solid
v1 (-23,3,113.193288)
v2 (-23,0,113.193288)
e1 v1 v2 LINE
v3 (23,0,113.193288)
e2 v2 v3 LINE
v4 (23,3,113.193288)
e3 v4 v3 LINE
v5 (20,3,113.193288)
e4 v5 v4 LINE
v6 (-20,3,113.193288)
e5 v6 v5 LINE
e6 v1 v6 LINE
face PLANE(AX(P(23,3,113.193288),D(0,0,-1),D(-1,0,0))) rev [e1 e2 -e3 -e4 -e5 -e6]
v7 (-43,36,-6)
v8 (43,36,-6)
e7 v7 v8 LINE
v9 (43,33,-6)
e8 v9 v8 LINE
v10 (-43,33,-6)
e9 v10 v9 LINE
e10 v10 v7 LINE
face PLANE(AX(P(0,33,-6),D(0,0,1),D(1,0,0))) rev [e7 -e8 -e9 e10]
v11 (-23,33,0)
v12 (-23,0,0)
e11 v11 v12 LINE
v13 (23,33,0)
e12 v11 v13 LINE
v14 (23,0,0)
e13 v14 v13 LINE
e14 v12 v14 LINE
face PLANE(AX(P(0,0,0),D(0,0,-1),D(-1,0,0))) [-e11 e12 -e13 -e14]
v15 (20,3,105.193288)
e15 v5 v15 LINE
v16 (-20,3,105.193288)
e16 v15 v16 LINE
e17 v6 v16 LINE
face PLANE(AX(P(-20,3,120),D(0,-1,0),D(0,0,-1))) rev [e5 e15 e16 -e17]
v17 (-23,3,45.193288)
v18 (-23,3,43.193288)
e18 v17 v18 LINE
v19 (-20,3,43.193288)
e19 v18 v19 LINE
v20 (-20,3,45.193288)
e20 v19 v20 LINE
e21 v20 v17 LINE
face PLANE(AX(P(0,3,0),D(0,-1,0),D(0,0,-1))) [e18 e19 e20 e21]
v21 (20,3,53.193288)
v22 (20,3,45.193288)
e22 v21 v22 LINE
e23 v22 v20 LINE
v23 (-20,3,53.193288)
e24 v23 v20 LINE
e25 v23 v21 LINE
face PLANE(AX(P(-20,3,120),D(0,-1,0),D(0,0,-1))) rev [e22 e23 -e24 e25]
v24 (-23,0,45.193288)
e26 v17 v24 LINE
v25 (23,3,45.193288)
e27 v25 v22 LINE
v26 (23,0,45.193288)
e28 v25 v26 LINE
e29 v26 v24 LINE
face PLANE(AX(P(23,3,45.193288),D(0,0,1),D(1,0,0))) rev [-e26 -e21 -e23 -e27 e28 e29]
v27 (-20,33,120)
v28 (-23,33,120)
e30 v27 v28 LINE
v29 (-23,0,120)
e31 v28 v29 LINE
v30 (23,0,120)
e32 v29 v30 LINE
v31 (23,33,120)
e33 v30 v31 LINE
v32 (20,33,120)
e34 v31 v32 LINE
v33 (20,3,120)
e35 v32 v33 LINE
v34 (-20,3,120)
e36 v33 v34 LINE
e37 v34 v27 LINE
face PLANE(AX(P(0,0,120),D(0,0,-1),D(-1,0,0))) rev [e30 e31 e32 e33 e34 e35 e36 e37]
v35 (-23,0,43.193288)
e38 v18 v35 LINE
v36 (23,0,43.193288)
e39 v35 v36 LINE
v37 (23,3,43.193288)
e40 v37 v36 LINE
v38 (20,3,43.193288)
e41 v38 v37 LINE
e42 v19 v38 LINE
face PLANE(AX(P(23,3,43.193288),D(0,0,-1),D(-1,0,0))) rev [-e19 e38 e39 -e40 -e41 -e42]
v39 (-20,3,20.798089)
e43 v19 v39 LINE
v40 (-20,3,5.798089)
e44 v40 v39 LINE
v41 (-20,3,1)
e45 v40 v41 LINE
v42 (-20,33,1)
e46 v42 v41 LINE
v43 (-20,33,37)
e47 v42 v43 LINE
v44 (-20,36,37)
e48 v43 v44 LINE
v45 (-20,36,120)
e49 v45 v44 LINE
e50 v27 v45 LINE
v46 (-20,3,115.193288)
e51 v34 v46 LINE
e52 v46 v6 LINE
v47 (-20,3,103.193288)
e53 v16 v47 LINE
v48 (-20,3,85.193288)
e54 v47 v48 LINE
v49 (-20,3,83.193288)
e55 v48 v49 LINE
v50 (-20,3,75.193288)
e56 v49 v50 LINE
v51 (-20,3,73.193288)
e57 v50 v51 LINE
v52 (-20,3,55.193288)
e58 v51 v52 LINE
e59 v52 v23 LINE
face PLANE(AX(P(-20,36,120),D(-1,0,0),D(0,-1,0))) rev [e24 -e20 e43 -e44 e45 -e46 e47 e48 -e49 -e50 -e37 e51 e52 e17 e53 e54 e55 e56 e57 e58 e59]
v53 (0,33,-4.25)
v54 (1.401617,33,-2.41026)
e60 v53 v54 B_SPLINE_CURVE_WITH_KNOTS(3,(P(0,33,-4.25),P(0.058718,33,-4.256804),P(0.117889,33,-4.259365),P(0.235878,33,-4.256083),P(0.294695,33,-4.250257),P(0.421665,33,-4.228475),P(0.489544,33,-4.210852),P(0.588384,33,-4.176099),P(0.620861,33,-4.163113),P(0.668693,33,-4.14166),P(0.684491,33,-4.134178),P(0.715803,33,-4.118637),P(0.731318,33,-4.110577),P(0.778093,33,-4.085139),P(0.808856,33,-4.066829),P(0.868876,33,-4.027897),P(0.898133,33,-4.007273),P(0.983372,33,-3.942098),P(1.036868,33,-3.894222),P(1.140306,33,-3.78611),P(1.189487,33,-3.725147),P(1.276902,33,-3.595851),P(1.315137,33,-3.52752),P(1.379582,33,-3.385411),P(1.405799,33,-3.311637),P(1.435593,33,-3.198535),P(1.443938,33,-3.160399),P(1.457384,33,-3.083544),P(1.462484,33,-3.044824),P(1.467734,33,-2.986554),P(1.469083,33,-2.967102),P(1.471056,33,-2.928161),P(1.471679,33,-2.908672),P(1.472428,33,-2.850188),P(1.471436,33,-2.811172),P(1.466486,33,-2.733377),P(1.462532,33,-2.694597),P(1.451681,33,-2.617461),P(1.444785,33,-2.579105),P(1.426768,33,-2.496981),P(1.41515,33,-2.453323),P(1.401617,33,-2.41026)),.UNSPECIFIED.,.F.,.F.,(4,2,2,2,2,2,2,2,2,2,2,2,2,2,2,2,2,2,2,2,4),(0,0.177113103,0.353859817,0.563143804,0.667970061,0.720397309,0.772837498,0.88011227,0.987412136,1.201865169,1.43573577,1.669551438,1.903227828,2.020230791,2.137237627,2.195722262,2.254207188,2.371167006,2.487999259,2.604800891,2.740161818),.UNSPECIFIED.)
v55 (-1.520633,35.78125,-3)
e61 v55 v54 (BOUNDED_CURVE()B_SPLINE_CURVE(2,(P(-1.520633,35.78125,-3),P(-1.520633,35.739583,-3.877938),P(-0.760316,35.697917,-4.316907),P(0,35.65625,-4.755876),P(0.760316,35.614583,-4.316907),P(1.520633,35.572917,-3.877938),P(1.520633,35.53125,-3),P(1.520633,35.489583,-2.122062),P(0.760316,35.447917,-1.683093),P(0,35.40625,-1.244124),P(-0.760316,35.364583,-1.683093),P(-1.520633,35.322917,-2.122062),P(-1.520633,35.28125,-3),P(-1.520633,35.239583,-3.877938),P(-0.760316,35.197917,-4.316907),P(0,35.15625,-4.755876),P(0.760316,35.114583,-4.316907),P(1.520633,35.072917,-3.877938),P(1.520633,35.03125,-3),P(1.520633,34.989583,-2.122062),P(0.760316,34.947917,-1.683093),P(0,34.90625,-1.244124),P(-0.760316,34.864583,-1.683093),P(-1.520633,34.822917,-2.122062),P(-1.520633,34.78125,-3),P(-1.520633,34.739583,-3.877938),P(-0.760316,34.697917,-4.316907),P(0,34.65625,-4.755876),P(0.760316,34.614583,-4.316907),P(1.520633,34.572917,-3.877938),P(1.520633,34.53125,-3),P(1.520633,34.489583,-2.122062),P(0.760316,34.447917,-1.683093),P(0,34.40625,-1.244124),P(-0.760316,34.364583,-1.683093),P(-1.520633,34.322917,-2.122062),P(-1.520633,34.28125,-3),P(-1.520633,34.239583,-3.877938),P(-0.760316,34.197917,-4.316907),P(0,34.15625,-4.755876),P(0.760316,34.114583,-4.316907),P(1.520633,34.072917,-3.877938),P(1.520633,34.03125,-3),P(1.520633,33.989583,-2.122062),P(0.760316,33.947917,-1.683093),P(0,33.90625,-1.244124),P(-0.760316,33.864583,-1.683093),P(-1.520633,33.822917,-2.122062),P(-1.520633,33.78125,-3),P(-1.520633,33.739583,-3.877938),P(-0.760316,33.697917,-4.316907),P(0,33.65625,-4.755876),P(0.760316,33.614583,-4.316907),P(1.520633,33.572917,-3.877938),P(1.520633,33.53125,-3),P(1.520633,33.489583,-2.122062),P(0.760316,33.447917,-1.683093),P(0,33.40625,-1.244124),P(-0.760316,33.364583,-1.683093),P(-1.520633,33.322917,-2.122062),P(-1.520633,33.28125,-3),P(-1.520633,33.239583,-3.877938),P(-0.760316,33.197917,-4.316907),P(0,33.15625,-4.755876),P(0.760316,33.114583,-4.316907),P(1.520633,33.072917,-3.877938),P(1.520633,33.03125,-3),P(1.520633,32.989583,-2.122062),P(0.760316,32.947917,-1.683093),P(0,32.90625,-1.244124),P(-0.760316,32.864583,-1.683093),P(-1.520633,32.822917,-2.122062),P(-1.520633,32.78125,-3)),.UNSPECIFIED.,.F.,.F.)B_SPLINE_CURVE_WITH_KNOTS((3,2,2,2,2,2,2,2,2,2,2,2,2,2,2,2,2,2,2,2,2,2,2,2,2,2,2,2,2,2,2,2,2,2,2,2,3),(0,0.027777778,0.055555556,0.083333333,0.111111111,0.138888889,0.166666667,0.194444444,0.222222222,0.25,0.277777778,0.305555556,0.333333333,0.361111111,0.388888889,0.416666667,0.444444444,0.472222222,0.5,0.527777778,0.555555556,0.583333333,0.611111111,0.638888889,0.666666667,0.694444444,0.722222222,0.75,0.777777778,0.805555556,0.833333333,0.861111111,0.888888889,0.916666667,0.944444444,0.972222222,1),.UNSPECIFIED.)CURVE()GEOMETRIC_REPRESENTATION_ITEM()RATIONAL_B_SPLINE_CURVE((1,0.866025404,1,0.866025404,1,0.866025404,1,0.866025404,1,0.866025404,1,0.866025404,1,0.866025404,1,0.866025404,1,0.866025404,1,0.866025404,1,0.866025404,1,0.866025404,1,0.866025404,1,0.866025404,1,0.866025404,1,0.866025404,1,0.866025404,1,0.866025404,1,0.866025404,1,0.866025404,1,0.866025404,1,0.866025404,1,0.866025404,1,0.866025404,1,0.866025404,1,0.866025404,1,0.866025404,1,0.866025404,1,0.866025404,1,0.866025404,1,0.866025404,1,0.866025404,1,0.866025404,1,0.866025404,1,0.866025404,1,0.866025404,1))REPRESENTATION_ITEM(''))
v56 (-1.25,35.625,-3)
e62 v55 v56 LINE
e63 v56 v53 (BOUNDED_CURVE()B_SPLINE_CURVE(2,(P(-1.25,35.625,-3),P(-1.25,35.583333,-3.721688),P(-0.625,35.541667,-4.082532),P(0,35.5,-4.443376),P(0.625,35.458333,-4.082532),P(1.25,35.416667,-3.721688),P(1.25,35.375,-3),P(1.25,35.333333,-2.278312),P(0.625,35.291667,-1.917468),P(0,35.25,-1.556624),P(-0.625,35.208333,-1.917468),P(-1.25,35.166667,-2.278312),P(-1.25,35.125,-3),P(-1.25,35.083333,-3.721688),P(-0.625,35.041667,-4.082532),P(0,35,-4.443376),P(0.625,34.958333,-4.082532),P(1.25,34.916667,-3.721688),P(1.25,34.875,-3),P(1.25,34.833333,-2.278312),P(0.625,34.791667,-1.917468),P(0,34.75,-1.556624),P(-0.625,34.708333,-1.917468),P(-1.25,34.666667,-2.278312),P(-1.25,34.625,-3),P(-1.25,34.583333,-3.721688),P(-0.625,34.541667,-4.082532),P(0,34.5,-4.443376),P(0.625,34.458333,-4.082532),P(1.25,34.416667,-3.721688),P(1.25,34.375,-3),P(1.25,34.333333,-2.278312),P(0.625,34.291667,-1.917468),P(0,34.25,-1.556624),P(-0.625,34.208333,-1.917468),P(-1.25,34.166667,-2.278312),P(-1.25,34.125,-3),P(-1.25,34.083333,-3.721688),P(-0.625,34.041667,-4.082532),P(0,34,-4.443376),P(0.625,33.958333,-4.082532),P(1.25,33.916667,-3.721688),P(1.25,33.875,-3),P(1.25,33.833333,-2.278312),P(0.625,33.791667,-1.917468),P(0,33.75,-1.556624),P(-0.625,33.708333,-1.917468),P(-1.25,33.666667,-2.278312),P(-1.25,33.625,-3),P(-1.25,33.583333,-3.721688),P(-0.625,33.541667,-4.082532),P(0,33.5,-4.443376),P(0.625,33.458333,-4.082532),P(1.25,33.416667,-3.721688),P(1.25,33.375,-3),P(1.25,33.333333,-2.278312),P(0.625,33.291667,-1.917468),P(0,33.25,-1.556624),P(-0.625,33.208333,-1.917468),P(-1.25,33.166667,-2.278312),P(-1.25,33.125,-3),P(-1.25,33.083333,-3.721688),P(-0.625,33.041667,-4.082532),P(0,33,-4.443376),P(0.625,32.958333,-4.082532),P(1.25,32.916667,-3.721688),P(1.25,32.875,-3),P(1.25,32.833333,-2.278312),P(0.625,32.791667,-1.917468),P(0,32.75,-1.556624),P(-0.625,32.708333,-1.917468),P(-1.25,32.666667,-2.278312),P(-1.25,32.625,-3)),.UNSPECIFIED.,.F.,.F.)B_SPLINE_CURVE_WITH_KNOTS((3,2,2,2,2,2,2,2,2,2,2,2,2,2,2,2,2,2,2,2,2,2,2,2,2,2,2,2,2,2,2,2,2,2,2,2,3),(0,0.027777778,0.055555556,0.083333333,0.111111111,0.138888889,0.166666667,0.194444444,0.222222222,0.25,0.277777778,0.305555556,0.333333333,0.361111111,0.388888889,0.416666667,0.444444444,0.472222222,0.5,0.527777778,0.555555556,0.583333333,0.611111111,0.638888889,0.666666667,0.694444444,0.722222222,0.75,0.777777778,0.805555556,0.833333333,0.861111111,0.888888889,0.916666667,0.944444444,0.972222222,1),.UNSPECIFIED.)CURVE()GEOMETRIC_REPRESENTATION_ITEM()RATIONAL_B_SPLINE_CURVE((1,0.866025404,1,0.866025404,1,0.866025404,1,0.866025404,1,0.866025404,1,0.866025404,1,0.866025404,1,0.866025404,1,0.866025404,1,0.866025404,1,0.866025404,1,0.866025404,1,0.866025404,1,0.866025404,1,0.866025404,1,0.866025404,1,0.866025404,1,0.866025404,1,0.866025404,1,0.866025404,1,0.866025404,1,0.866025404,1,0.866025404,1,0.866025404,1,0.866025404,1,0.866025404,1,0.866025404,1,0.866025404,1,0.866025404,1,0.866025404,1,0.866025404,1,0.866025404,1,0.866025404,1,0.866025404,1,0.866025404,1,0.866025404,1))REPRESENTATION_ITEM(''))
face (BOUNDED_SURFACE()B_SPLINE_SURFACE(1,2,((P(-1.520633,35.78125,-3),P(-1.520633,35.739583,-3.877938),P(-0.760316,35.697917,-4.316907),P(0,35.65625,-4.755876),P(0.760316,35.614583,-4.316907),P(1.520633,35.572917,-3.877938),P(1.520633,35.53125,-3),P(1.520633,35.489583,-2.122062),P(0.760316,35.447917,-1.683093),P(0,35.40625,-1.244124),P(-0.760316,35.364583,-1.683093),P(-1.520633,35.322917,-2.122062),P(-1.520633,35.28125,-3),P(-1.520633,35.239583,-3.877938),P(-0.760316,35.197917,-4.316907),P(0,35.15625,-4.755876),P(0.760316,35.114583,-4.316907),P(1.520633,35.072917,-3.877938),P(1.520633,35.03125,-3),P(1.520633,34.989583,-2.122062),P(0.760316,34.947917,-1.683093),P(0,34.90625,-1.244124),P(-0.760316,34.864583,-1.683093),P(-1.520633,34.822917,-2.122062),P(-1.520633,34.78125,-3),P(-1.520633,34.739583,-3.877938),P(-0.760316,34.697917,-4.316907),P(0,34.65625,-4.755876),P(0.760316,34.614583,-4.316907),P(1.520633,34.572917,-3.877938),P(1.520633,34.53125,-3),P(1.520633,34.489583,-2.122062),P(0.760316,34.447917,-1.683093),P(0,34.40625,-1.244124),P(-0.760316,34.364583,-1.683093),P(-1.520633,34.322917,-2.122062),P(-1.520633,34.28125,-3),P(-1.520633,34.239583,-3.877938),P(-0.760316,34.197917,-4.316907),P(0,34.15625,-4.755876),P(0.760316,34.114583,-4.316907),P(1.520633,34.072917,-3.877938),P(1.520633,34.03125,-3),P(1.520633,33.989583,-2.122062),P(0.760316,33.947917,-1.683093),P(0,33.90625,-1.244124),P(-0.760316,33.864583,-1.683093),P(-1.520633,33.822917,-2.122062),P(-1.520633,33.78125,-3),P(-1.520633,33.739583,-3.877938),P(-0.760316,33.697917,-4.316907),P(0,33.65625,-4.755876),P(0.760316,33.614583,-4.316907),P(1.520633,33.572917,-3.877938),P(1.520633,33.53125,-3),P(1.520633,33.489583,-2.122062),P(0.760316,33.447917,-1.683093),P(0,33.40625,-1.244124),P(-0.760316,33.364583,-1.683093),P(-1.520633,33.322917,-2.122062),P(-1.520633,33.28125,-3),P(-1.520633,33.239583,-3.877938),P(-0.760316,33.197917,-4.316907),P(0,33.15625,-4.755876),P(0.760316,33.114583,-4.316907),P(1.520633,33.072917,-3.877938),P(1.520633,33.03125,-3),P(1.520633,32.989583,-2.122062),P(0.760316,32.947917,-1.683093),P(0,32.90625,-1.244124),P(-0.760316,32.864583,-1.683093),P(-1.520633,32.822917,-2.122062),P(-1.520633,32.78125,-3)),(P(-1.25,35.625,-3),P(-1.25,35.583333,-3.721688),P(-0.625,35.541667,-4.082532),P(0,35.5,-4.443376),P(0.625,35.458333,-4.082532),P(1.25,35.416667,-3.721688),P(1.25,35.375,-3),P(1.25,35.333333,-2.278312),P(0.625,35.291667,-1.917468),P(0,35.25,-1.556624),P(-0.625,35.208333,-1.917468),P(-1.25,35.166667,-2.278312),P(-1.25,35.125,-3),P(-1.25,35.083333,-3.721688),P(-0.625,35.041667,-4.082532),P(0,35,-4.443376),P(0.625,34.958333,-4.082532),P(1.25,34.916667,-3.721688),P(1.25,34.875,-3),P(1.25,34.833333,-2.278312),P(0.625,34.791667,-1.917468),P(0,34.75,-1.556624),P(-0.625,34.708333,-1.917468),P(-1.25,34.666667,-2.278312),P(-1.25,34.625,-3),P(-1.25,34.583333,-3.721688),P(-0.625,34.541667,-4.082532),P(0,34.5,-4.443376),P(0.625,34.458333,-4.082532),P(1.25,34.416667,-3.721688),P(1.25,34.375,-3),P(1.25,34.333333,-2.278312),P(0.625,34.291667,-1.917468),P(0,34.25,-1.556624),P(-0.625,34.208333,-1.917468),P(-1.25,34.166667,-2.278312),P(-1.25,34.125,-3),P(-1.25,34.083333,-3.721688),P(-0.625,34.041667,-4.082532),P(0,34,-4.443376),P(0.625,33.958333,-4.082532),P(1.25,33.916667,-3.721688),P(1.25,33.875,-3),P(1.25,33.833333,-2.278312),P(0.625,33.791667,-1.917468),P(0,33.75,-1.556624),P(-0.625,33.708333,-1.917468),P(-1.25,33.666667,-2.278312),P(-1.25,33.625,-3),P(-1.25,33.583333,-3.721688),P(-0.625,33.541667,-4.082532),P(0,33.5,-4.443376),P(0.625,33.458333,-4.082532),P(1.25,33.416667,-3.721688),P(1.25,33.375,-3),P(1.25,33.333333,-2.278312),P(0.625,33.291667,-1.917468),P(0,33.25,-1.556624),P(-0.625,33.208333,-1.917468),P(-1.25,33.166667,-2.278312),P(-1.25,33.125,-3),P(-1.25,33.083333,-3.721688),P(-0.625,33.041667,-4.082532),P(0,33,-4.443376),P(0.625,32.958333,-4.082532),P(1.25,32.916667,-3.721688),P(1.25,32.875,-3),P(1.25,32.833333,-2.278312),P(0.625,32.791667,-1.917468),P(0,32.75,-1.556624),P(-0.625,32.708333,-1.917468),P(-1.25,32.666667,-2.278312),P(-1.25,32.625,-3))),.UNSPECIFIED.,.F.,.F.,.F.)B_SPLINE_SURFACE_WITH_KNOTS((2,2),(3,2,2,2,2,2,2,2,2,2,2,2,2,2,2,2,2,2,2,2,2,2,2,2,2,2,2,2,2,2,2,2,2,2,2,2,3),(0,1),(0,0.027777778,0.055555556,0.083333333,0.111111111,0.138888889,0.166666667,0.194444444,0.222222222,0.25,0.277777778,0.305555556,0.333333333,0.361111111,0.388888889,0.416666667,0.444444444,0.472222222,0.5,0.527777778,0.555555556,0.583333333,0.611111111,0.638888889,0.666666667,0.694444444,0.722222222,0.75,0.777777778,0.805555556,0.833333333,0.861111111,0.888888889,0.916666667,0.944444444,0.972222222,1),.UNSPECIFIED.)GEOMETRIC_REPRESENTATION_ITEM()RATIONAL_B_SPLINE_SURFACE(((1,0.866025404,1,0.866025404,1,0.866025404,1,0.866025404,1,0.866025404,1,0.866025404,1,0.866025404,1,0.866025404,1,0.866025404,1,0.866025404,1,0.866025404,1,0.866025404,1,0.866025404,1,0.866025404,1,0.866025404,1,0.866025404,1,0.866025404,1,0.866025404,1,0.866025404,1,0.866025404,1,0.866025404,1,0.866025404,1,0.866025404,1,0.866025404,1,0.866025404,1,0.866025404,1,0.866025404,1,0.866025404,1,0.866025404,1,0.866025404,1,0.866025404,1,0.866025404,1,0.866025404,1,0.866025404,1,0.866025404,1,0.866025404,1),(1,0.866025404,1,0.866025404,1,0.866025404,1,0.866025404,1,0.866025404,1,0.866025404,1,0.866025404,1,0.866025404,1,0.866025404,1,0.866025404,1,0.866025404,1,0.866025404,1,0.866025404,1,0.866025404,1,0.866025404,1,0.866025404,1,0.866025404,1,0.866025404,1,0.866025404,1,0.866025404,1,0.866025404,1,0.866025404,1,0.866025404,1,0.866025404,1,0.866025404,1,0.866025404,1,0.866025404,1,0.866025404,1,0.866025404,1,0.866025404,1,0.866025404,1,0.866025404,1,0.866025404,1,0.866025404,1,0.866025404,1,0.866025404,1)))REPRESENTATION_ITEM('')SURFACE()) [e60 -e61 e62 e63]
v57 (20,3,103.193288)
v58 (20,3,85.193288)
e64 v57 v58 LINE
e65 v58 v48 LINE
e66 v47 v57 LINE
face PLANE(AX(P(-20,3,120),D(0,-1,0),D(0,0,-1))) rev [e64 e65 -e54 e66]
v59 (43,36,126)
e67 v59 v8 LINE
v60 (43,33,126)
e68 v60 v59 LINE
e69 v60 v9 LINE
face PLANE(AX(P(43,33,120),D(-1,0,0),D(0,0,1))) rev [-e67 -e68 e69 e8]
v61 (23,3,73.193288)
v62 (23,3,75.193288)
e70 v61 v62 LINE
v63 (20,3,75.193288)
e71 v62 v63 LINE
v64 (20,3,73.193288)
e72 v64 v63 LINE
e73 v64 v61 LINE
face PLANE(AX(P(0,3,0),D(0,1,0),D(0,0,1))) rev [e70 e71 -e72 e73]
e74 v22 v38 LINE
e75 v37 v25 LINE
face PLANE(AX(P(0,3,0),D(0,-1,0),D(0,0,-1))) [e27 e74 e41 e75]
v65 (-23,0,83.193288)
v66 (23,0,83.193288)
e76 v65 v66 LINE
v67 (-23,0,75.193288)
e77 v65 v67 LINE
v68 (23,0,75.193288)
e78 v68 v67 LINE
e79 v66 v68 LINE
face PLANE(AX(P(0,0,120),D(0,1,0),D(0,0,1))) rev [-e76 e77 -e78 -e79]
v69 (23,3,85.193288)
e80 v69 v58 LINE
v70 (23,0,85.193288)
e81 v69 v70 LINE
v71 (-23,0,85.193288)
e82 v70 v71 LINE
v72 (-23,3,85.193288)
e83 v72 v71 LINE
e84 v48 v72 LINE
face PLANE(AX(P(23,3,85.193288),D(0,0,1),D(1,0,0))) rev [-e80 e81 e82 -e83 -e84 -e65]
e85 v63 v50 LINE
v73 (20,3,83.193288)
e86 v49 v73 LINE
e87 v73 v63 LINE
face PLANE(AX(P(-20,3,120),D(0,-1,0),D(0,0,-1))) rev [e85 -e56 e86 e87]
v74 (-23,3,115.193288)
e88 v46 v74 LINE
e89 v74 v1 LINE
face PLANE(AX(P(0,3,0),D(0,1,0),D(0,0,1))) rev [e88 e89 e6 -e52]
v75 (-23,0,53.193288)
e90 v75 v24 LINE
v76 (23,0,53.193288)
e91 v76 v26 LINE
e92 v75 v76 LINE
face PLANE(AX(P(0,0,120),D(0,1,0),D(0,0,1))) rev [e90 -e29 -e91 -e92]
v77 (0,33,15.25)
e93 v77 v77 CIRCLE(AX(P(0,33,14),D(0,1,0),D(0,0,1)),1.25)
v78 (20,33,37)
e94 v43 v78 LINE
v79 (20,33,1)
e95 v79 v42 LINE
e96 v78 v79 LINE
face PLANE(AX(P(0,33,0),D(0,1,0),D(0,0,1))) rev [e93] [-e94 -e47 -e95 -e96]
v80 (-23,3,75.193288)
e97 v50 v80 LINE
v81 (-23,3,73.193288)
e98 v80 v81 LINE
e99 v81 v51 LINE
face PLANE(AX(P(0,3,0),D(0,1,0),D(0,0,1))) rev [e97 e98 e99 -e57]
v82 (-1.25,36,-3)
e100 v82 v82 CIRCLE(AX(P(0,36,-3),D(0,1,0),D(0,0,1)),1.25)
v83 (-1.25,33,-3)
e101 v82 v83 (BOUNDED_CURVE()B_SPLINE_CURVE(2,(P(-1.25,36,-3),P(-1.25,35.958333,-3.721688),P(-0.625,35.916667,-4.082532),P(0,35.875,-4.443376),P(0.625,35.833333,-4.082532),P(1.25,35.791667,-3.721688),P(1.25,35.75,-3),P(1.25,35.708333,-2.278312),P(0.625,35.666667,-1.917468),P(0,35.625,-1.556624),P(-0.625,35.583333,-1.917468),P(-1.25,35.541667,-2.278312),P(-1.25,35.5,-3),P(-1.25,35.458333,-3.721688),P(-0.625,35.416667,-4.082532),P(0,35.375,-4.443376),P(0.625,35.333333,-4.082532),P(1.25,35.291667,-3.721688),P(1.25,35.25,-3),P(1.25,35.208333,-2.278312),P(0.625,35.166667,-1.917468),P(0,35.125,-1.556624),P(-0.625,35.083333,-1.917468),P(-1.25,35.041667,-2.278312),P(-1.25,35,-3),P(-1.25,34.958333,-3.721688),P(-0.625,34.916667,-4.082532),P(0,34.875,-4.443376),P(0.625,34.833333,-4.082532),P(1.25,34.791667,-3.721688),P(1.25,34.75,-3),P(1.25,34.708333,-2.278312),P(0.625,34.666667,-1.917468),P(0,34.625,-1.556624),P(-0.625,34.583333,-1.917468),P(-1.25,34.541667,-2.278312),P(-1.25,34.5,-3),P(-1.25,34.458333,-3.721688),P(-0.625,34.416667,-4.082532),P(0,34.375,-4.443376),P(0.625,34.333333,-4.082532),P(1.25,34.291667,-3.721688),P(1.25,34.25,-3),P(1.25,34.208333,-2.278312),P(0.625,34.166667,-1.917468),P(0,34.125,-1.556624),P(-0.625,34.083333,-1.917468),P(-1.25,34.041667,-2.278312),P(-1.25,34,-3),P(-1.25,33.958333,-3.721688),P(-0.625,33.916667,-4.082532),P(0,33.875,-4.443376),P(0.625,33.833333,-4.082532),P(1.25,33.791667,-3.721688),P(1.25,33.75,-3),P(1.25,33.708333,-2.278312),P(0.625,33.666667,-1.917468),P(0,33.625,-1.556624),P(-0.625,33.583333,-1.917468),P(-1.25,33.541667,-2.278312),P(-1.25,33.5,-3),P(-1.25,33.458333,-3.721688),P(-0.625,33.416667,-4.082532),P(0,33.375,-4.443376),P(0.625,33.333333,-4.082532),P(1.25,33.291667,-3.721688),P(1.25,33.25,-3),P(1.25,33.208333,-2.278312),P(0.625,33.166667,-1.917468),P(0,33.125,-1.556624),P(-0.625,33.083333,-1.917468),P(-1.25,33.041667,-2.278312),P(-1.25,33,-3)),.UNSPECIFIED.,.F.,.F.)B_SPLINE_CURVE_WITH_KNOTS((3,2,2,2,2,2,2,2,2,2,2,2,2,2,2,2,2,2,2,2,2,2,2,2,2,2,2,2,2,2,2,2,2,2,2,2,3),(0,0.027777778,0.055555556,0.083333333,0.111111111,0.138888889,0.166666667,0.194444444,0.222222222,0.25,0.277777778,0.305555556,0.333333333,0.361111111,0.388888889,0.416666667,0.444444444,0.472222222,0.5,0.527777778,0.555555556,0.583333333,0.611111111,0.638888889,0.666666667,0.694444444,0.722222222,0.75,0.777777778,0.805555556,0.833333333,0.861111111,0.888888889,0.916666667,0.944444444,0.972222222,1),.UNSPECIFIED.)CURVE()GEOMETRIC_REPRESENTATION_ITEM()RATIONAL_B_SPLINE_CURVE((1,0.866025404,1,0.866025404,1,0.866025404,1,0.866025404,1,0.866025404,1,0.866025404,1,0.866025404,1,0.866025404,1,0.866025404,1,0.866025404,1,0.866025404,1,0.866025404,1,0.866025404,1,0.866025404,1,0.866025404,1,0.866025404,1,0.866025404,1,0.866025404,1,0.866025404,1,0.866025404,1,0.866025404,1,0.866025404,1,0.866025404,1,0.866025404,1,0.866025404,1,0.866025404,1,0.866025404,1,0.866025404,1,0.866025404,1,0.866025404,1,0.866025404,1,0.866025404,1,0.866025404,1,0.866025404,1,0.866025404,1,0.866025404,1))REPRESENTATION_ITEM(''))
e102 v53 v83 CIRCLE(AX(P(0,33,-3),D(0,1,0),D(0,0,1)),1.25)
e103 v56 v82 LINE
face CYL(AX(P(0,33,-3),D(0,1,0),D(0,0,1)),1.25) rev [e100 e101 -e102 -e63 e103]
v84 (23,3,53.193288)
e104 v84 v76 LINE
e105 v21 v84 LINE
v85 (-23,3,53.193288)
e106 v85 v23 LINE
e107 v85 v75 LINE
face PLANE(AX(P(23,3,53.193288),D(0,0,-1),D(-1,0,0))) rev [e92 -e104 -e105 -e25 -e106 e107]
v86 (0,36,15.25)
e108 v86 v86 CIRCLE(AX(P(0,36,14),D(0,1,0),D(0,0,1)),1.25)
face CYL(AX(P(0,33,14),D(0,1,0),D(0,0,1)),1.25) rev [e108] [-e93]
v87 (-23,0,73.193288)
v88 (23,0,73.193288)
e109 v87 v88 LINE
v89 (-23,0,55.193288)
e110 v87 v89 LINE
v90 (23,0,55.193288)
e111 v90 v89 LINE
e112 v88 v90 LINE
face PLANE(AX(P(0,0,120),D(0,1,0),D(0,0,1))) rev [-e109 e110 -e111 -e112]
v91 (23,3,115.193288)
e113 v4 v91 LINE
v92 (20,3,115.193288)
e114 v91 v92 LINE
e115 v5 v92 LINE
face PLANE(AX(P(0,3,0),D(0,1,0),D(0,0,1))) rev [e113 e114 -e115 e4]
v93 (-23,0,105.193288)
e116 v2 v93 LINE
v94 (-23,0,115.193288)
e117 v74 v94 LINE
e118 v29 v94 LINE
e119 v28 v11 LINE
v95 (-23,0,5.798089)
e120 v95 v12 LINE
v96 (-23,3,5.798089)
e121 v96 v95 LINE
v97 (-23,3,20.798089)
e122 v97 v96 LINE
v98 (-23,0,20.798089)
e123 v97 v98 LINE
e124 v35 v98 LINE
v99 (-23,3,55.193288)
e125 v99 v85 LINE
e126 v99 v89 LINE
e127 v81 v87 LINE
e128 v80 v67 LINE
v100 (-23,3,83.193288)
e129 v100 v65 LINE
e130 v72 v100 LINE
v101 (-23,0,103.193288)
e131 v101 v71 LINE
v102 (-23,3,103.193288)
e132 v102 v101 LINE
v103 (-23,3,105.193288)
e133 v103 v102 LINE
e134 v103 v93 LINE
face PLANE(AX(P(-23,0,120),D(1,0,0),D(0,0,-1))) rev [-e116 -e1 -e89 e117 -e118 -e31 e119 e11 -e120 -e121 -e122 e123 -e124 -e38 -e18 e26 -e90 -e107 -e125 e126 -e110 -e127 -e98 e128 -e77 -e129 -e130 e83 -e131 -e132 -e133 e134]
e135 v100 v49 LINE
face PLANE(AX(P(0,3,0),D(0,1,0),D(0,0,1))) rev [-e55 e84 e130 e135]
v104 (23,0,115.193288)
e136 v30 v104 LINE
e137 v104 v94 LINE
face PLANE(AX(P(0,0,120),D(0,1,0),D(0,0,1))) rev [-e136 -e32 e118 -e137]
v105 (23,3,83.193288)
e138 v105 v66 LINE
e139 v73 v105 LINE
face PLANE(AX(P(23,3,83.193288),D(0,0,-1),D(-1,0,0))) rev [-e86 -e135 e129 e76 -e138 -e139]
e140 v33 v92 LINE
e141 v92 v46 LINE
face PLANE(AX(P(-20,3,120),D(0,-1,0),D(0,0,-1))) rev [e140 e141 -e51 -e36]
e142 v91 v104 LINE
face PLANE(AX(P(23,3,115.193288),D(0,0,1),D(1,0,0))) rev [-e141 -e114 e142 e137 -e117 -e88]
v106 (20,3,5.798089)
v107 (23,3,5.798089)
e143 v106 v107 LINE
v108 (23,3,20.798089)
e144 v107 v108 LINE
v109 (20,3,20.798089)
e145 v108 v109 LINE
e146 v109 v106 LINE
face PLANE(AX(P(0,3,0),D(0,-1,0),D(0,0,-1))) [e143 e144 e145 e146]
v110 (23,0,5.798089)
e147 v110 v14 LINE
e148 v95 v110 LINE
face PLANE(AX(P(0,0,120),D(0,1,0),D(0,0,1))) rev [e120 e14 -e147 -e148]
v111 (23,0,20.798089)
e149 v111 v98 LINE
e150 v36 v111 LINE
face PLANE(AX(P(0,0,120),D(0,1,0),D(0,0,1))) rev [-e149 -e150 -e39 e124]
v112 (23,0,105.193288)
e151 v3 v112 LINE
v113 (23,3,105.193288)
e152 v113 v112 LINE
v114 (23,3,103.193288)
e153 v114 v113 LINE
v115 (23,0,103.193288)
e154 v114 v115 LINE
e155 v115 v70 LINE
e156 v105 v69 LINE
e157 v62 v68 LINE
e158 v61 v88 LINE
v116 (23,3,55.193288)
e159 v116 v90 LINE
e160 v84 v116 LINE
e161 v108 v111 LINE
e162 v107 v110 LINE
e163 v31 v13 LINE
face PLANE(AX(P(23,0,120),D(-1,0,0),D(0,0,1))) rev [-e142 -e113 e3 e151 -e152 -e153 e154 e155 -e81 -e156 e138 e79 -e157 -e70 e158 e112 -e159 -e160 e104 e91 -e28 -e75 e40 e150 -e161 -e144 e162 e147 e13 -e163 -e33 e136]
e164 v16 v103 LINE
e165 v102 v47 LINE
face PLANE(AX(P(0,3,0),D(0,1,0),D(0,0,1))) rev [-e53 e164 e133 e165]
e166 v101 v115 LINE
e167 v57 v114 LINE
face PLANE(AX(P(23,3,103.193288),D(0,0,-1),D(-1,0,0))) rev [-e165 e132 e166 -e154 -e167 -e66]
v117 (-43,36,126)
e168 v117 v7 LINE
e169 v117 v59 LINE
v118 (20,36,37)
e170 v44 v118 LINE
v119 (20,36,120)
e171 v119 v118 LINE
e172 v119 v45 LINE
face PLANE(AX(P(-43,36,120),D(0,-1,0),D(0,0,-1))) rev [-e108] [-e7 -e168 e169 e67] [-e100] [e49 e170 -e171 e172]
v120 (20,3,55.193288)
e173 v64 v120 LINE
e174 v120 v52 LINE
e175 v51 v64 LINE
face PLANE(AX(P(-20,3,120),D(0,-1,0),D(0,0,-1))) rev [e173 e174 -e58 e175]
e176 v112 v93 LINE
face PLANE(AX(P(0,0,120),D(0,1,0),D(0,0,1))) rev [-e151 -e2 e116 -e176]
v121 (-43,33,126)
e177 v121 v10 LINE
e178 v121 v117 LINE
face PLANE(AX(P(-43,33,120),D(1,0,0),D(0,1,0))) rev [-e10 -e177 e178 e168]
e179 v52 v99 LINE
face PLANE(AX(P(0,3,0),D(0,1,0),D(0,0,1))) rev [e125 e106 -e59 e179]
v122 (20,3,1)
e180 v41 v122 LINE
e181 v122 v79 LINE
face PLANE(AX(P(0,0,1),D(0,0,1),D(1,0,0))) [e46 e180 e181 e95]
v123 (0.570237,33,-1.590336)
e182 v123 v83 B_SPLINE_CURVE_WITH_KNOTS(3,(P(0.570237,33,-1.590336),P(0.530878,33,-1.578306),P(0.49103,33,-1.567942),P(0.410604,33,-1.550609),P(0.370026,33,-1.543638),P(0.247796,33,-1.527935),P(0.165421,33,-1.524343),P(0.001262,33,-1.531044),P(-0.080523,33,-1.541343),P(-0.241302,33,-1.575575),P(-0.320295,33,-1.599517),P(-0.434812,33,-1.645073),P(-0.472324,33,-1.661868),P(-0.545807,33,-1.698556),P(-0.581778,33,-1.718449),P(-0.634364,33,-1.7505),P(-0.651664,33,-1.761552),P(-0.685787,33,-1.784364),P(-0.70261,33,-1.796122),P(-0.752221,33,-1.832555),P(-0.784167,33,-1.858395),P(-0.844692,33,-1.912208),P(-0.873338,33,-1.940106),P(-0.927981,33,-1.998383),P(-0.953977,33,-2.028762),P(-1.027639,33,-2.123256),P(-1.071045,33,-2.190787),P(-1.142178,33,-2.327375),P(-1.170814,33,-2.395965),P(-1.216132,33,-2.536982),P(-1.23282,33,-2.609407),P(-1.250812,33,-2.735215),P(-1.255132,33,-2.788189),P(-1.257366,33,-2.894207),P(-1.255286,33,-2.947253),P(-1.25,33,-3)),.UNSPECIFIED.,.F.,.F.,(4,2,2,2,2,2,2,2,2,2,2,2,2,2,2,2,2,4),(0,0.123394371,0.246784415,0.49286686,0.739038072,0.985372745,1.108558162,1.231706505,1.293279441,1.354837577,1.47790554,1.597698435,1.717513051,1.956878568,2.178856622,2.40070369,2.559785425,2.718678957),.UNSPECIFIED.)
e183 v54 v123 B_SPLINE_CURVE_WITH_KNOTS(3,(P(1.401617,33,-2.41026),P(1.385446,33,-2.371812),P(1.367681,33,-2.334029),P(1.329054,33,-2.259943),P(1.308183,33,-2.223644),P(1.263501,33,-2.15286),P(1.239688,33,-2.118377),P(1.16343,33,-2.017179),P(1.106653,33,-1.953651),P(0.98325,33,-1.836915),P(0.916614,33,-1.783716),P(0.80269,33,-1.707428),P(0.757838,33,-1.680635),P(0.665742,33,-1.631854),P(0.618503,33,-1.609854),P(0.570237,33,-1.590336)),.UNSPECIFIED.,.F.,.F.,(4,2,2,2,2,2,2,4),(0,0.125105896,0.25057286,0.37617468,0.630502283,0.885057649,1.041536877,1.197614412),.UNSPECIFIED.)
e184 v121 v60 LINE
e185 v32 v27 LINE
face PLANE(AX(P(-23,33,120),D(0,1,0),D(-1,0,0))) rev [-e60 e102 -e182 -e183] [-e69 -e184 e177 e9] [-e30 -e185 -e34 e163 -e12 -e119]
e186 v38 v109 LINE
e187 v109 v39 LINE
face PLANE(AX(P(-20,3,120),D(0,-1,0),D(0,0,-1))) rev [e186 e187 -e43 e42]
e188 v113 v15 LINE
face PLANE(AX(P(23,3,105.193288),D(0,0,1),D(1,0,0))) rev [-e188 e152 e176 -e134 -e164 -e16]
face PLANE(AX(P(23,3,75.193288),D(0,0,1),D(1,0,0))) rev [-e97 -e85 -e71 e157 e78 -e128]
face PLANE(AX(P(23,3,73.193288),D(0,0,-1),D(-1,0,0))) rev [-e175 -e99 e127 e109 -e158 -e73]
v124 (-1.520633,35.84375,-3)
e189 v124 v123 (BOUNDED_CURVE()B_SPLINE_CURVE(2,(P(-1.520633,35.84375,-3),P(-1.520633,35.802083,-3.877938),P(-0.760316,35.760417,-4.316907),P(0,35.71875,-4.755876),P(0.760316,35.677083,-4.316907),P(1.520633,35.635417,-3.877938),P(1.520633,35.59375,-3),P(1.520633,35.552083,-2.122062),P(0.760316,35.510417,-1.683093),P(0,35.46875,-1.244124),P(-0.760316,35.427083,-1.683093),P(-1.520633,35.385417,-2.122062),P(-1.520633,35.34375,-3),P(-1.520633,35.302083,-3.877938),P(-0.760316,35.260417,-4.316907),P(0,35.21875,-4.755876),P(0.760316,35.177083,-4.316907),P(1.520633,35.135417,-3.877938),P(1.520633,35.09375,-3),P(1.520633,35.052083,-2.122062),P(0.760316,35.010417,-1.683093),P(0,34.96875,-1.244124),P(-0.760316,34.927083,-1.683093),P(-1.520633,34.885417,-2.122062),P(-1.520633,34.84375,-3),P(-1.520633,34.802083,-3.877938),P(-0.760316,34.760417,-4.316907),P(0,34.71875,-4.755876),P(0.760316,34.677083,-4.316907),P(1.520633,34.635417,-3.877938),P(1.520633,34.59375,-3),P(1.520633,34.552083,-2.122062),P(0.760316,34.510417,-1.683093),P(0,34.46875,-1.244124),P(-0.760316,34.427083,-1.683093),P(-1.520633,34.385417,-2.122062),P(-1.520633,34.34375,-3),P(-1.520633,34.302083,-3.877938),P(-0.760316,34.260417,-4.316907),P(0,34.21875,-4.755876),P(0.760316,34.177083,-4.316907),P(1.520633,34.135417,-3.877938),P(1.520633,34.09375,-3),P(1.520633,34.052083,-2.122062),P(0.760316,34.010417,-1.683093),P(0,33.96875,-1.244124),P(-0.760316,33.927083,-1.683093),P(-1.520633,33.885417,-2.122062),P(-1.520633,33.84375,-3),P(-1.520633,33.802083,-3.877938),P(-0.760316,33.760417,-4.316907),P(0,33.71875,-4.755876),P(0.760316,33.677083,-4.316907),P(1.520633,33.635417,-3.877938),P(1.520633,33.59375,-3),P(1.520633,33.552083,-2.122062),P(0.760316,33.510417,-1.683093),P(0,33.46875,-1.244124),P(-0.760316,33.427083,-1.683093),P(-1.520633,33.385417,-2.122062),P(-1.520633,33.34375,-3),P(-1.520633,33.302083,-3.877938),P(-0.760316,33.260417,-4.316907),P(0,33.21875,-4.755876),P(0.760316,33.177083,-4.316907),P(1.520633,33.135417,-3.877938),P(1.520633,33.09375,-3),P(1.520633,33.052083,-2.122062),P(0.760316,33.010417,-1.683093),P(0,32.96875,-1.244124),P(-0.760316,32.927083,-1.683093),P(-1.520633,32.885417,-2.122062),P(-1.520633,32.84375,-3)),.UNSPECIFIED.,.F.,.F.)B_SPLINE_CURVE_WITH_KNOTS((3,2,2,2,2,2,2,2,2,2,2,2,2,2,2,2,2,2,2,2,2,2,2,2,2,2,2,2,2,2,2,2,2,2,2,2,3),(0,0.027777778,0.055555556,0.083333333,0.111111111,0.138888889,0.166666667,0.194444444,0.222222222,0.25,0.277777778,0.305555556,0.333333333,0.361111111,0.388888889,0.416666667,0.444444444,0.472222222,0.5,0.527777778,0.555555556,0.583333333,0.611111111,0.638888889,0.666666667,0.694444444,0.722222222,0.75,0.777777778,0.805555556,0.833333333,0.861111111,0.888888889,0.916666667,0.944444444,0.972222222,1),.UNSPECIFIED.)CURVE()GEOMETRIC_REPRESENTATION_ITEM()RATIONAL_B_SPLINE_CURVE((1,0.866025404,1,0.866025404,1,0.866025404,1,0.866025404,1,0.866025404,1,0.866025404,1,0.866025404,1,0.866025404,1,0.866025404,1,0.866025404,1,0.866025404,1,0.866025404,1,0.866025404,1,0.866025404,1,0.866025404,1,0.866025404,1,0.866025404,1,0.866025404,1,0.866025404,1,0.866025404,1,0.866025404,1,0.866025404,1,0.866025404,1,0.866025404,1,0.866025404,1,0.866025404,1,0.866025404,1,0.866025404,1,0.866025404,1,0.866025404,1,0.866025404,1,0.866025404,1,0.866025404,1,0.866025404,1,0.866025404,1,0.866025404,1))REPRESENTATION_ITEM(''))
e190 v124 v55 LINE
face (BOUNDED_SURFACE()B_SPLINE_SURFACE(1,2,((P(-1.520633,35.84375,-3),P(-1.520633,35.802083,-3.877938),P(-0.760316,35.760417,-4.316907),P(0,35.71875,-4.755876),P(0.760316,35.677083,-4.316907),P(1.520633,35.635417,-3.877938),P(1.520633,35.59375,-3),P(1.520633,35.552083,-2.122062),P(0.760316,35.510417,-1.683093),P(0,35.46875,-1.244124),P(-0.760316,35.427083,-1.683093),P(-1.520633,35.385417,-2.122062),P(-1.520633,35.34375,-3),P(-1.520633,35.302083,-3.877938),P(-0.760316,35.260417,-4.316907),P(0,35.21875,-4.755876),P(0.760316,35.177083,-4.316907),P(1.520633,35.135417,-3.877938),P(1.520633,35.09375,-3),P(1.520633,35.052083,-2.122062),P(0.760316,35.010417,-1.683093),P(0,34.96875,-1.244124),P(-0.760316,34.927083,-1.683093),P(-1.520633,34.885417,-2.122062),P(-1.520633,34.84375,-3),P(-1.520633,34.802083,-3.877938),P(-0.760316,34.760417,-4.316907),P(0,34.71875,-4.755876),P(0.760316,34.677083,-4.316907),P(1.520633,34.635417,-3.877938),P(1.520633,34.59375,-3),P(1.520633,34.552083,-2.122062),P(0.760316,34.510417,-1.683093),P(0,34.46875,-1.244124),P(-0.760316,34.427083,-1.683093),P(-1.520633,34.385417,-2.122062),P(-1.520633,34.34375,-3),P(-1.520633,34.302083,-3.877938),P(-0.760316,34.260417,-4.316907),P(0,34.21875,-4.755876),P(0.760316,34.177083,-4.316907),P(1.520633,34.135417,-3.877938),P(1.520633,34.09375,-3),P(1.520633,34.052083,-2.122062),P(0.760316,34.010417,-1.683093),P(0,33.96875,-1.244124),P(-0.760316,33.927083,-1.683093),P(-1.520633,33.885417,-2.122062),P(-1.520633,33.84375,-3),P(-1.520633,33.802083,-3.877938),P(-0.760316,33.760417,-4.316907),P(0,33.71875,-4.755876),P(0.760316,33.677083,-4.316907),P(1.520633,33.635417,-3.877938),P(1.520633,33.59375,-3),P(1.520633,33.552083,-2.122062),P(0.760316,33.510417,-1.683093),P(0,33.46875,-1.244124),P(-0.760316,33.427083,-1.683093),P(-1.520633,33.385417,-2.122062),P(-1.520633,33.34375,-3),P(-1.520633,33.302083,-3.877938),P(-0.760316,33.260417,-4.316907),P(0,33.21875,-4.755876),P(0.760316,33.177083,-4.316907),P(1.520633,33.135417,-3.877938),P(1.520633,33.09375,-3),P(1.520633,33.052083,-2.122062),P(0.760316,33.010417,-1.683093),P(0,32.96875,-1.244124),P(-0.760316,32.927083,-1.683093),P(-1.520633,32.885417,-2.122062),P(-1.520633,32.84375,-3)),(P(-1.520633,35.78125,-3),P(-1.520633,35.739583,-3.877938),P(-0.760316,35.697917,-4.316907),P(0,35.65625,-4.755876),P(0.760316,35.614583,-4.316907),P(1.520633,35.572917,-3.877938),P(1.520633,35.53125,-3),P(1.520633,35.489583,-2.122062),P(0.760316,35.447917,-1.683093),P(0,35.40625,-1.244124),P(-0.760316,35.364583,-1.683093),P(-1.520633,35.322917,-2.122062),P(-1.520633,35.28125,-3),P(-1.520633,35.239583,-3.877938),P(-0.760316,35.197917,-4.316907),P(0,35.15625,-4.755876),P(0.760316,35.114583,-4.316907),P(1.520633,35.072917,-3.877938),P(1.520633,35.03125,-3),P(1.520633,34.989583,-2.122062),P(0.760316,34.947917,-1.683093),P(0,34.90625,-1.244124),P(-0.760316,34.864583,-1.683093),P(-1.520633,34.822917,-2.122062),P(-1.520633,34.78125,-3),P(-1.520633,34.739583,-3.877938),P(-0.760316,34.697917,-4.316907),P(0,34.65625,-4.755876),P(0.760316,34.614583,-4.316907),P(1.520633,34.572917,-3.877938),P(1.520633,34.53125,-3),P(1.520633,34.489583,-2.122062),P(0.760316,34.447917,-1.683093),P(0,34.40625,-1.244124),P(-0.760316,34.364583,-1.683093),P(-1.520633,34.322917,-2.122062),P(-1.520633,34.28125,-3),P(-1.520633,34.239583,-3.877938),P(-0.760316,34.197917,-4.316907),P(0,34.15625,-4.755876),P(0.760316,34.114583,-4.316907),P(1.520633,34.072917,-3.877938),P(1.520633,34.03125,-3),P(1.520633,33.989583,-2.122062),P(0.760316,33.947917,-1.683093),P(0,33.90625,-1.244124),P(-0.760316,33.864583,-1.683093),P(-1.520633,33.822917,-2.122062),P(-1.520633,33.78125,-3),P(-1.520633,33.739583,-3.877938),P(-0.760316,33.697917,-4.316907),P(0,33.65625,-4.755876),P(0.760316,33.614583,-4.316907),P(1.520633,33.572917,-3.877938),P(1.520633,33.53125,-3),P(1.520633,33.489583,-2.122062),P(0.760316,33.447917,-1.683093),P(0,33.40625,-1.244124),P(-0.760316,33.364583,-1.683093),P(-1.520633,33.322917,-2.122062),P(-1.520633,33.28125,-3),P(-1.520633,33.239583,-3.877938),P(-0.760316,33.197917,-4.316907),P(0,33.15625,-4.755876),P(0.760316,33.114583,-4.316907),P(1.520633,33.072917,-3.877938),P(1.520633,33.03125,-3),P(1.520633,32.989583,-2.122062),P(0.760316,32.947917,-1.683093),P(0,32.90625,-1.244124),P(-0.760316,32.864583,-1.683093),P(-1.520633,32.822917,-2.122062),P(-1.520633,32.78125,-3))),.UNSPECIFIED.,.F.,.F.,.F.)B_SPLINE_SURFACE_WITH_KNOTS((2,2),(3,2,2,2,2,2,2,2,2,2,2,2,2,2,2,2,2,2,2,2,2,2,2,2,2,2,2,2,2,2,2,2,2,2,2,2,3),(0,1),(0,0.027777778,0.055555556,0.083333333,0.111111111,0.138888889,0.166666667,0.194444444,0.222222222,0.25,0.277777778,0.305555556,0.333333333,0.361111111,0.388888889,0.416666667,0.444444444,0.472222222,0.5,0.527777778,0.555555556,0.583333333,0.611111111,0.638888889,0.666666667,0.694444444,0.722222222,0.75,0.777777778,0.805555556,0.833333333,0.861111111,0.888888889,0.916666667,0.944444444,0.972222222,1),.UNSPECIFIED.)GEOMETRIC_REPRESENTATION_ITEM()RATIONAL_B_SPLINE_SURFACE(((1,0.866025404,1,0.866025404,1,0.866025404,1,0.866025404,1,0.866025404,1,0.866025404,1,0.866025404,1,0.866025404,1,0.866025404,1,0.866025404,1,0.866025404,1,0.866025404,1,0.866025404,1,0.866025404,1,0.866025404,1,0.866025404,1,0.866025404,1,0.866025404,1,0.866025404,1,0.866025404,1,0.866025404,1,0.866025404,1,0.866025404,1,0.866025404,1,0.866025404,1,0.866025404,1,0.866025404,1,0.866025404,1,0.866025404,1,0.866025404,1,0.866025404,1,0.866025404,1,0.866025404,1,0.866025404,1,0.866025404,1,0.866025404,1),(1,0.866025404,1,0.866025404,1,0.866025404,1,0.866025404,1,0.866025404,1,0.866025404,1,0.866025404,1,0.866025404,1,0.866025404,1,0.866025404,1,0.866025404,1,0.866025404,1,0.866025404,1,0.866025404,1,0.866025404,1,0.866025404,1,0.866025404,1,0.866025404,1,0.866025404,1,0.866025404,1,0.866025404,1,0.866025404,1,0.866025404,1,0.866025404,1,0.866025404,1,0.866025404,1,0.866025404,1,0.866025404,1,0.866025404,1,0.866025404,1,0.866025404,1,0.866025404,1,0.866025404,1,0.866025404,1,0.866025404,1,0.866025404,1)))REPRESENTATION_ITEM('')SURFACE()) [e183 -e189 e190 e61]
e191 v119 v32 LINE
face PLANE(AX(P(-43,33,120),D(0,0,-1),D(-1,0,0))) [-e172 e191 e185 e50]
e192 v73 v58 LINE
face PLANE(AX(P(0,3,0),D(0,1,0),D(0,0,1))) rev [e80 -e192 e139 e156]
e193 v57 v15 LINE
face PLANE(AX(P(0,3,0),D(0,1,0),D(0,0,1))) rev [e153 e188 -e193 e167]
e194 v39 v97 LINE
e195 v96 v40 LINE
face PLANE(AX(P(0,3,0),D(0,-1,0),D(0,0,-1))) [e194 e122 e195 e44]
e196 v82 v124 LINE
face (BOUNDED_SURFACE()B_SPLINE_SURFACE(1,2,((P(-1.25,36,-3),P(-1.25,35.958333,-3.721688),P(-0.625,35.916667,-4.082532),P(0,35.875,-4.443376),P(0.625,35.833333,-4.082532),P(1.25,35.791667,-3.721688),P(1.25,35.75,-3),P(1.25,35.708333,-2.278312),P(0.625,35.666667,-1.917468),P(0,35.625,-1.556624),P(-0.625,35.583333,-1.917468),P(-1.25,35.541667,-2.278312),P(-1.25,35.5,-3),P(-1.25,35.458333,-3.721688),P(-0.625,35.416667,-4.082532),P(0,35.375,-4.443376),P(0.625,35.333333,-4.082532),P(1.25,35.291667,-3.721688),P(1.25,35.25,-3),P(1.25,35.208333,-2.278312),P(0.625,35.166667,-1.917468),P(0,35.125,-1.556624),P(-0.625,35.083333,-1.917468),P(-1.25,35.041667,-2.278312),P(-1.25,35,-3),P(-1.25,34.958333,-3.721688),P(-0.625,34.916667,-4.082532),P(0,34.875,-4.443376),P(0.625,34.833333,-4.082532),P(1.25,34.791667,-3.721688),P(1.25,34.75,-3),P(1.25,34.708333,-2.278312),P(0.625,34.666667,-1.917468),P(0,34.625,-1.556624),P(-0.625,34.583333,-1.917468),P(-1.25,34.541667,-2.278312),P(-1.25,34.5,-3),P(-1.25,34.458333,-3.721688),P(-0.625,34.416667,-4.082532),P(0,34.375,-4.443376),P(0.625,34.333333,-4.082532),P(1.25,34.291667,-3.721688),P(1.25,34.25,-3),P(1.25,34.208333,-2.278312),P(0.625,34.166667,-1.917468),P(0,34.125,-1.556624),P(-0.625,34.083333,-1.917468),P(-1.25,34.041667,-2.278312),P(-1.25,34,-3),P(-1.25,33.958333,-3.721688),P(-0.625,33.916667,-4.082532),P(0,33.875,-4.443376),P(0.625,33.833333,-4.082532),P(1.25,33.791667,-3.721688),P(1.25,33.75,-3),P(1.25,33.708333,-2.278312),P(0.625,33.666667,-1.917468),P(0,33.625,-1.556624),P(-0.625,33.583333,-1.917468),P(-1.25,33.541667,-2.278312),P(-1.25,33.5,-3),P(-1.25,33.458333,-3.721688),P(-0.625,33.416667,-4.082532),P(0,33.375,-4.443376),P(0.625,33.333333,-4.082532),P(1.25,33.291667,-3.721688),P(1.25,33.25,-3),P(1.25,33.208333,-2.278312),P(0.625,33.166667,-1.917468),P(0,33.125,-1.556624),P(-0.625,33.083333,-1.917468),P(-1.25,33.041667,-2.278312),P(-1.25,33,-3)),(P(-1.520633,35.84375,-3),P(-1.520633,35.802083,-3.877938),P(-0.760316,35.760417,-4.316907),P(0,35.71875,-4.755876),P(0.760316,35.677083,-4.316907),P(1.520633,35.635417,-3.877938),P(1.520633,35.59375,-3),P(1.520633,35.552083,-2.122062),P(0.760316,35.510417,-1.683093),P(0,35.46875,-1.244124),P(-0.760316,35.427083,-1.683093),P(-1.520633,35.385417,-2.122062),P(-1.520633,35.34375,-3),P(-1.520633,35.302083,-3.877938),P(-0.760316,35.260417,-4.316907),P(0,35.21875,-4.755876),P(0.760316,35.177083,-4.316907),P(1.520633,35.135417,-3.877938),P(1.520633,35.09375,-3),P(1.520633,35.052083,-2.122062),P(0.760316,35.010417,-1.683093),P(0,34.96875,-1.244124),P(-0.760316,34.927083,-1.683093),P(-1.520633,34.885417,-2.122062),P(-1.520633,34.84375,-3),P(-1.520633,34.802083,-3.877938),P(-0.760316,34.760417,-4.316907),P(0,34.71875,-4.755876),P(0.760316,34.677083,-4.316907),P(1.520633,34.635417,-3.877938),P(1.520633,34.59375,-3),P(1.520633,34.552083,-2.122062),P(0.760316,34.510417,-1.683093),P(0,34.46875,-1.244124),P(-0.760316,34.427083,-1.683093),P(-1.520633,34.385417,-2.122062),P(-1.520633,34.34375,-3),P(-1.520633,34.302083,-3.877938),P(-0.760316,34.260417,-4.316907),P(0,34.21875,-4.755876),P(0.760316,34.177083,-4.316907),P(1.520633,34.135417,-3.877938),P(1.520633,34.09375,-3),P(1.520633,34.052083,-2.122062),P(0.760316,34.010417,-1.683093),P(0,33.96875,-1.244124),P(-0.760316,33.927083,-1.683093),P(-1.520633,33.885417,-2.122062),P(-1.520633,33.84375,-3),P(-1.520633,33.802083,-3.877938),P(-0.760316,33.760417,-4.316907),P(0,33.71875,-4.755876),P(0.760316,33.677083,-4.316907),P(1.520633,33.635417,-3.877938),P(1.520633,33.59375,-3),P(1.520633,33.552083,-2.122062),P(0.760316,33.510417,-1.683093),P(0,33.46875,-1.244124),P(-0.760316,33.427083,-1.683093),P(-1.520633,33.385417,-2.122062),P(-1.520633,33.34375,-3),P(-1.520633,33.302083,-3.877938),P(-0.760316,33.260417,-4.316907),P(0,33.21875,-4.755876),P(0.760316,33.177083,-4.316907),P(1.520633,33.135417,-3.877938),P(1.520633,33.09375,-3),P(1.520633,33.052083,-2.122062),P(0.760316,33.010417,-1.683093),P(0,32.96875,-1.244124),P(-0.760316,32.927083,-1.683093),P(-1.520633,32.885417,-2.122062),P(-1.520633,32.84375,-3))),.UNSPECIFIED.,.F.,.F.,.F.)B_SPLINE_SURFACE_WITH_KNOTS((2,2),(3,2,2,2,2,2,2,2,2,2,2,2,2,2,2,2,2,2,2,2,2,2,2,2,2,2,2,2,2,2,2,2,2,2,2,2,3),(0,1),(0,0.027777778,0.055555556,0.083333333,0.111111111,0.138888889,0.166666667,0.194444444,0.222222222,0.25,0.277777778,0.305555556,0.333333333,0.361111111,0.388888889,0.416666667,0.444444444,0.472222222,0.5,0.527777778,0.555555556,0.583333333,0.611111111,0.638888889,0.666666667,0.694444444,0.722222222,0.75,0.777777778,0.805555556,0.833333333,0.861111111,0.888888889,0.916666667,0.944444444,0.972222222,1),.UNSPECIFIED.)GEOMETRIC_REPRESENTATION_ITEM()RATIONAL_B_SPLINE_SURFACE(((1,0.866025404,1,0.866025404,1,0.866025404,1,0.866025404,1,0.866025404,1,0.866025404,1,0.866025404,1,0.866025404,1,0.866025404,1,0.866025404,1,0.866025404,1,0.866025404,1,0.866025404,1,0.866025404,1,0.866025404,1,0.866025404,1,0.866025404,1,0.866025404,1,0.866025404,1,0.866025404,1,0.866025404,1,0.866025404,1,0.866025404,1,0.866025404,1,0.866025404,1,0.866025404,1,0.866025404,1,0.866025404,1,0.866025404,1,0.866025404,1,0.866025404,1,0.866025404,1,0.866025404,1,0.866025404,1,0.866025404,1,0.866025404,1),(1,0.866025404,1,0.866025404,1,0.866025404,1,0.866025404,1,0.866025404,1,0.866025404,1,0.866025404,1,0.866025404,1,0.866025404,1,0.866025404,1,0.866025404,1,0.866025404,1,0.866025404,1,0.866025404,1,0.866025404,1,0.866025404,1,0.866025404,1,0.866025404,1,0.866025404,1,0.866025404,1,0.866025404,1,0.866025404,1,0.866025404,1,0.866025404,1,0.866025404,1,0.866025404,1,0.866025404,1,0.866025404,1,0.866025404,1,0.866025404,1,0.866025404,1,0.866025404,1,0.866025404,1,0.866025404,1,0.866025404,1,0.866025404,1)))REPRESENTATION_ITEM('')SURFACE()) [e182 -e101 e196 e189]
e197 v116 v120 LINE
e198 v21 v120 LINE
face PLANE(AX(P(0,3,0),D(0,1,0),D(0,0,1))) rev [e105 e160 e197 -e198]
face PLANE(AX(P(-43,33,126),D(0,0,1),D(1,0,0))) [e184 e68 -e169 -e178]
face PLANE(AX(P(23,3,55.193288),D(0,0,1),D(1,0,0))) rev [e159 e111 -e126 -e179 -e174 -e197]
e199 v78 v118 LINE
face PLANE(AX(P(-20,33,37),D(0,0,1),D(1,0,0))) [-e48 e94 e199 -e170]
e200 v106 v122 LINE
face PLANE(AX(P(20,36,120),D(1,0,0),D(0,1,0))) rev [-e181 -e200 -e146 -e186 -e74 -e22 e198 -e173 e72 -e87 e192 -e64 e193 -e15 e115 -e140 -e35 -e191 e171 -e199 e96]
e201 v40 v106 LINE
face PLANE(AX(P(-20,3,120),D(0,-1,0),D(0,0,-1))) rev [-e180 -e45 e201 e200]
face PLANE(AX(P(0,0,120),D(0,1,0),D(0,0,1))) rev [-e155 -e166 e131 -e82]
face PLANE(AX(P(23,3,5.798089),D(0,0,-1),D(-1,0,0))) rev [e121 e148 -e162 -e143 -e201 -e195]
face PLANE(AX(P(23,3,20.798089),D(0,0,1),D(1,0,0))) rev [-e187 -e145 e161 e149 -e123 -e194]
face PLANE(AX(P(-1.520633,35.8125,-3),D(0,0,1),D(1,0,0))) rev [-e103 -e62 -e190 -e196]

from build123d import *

# Parameters (mm, degrees)
BOSS_EXTRUDE1_DEPTH = 120
BOSS_EXTRUDE2_DEPTH = 1
SKETCH24_R          = 1.2500000000000002
BOSS_EXTRUDE5_DEPTH = 3
THREAD2_PITCH       = 0.5
SKETCH27_W          = 86
SKETCH27_H          = 6
BOSS_EXTRUDE6_DEPTH = 3
SKETCH28_R          = 1.250000000000001
BOSS_EXTRUDE7_DEPTH = 3
SKETCH29_W          = 46
SKETCH29_H          = 2
SKETCH29_H_2        = 2.000000000000014
SKETCH29_H_3        = 2.0000000000000284
CUT_EXTRUDE1_DEPTH  = 3


with BuildPart() as part:
    # Sketch1 → Boss-Extrude1 (new body)
    with BuildSketch(Plane.XY):
        Polygon((0, 0), (23, 0), (23, 33), (43, 33), (43, 36.00000000000001), (20, 36.00000000000001), (20.000000000000004, 2.9999999999999973), (-19.999999999999996, 2.9999999999999973), (-20, 36.000000000000014), (-43, 36.000000000000014), (-43, 33.00000000000001), (-23, 33), (-23, -2.82e-15), align=None)
    extrude(amount=BOSS_EXTRUDE1_DEPTH)

    # Sketch2 → Boss-Extrude2 (add)
    with BuildSketch(Plane.XY):
        Polygon((-20, 36.000000000000014), (20, 36.000000000000014), (20.000000000000004, 2.9999999999999973), (-19.999999999999996, 2.9999999999999973), align=None)
    extrude(amount=BOSS_EXTRUDE2_DEPTH)

    # Sketch24 → Boss-Extrude5 (add)
    # profile 1 of 2: a face of its own
    with BuildSketch(Plane(origin=(0, 36.000000000000014, 0), x_dir=(1, 0, 0), z_dir=(0, 1, 0))):
        Polygon((-43.000000000000014, 6), (-43, 0), (43, 0), (43, 6.000000000000011), align=None)
        with Locations(Location((0, 3, 0), (0, 0, 270))):
            Circle(SKETCH24_R, mode=Mode.SUBTRACT)
    # profile 2 of 2: a face of its own
    with BuildSketch(Plane(origin=(0, 36.000000000000014, 0), x_dir=(1, 0, 0), z_dir=(0, 1, 0))):
        Polygon((43, 0), (-43, 0), (-43, -120), (-20, -120), (-20, -1), (20, -1.0000000000000009), (20, -120), (43, -120), align=None)
    extrude(amount=-BOSS_EXTRUDE5_DEPTH)

    # Thread2: the profile of 螺纹线轮廓4 profile screwed along a right-hand helix of 6 turns, 6 arcs to a turn; built about Z, then put on its axis
    thread2_z = Axis((0, 0, 0), (0, 0, 1))
    thread2_corners = [(1.2497, 0, -0.000173205), (1.520632938, 0, 0.156249999), (1.520632938, 0, 0.218749999), (1.2497, 0, 0.375173204)]
    with BuildLine(mode=Mode.PRIVATE) as thread2_profile:
        Line(thread2_corners[0], thread2_corners[1])
        Line(thread2_corners[1], thread2_corners[2])
        Line(thread2_corners[2], thread2_corners[3])
        Line(thread2_corners[3], thread2_corners[0])
    thread2_cap = Face(thread2_profile.wire())
    thread2_turn_angles = [0, 30, 60, 90, 120, 150, 180, 210, 240, 270, 300, 330, 360]
    thread2_turn_weights = [1, 0.8660254037844387, 1, 0.8660254037844387, 1, 0.8660254037844387, 1, 0.8660254037844387, 1, 0.8660254037844387, 1, 0.8660254037844387, 1]
    thread2_turn_rails = [Edge.make_bspline([Vector(p[0], p[1], 0).rotate(thread2_z, thread2_turn_angles[k]) / thread2_turn_weights[k] + Vector(0, 0, p[2] + THREAD2_PITCH * thread2_turn_angles[k] / 360) for k in range(13)], [0, 0, 0, 1, 1, 2, 2, 3, 3, 4, 4, 5, 5, 6, 6, 6], 2, thread2_turn_weights) for p in thread2_corners]
    thread2_turn_sides = [Face.make_surface_from_curves(thread2_turn_rails[p[0]], thread2_turn_rails[p[1]]) for p in [(0, 1), (1, 2), (2, 3), (3, 0)]]
    thread2 = Plane(origin=(0, 36, -3), x_dir=(-1, 0, 0), z_dir=(0, -1, 0)) * Solid(Shell([*[p.moved(Location((0, 0, THREAD2_PITCH * i))) for i in range(6) for p in thread2_turn_sides], thread2_cap, thread2_cap.rotate(thread2_z, 2160).moved(Location((0, 0, THREAD2_PITCH * 2160 / 360)))]))
    add(thread2, mode=Mode.SUBTRACT)

    # Sketch27 → Boss-Extrude6 (add)
    with BuildSketch(Plane(origin=(0, 36.000000000000014, 0), x_dir=(1, 0, 0), z_dir=(0, 1, 0))):
        with Locations((-3.55e-15, -123.00000000000001)):
            Rectangle(SKETCH27_W, SKETCH27_H)
    extrude(amount=-BOSS_EXTRUDE6_DEPTH)

    # Sketch28 → Boss-Extrude7 (add)
    with BuildSketch(Plane(origin=(0, 36.000000000000014, 0), x_dir=(1, 0, 0), z_dir=(0, 1, 0))):
        Polygon((-19.999999999999996, -1.0000000000000009), (20.000000000000004, -1.0000000000000009), (20.000000000000004, -37.00000000000001), (-19.99999999999999, -37), align=None)
        with Locations(Location((0, -14.000000000000002, 0), (0, 0, 270))):
            Circle(SKETCH28_R, mode=Mode.SUBTRACT)
    extrude(amount=-BOSS_EXTRUDE7_DEPTH)

    # Sketch29 → Cut-Extrude1 (cut)
    with BuildSketch(Plane(origin=(0, 0, 0), x_dir=(-1, 0, 0), z_dir=(0, -1, 0))):
        Polygon((-23, -5.798088818556618), (23, -5.798088818556618), (23, -20.798088818556618), (-22.999999999999996, -20.798088818556618), align=None)
        with Locations((0, -44.19328812281581)):
            Rectangle(SKETCH29_W, SKETCH29_H)
        with Locations((1.0303e-13, -54.193288122815815)):
            Rectangle(SKETCH29_W, SKETCH29_H_2)
        with Locations((3.1264e-13, -74.19328812281582)):
            Rectangle(SKETCH29_W, SKETCH29_H)
        with Locations((4.1567e-13, -84.19328812281582)):
            Rectangle(SKETCH29_W, SKETCH29_H)
        with Locations((6.2528e-13, -104.19328812281582)):
            Rectangle(SKETCH29_W, SKETCH29_H_3)
        with Locations((7.2831e-13, -114.19328812281583)):
            Rectangle(SKETCH29_W, SKETCH29_H)
    extrude(amount=-CUT_EXTRUDE1_DEPTH, mode=Mode.SUBTRACT)


solid = part.part
